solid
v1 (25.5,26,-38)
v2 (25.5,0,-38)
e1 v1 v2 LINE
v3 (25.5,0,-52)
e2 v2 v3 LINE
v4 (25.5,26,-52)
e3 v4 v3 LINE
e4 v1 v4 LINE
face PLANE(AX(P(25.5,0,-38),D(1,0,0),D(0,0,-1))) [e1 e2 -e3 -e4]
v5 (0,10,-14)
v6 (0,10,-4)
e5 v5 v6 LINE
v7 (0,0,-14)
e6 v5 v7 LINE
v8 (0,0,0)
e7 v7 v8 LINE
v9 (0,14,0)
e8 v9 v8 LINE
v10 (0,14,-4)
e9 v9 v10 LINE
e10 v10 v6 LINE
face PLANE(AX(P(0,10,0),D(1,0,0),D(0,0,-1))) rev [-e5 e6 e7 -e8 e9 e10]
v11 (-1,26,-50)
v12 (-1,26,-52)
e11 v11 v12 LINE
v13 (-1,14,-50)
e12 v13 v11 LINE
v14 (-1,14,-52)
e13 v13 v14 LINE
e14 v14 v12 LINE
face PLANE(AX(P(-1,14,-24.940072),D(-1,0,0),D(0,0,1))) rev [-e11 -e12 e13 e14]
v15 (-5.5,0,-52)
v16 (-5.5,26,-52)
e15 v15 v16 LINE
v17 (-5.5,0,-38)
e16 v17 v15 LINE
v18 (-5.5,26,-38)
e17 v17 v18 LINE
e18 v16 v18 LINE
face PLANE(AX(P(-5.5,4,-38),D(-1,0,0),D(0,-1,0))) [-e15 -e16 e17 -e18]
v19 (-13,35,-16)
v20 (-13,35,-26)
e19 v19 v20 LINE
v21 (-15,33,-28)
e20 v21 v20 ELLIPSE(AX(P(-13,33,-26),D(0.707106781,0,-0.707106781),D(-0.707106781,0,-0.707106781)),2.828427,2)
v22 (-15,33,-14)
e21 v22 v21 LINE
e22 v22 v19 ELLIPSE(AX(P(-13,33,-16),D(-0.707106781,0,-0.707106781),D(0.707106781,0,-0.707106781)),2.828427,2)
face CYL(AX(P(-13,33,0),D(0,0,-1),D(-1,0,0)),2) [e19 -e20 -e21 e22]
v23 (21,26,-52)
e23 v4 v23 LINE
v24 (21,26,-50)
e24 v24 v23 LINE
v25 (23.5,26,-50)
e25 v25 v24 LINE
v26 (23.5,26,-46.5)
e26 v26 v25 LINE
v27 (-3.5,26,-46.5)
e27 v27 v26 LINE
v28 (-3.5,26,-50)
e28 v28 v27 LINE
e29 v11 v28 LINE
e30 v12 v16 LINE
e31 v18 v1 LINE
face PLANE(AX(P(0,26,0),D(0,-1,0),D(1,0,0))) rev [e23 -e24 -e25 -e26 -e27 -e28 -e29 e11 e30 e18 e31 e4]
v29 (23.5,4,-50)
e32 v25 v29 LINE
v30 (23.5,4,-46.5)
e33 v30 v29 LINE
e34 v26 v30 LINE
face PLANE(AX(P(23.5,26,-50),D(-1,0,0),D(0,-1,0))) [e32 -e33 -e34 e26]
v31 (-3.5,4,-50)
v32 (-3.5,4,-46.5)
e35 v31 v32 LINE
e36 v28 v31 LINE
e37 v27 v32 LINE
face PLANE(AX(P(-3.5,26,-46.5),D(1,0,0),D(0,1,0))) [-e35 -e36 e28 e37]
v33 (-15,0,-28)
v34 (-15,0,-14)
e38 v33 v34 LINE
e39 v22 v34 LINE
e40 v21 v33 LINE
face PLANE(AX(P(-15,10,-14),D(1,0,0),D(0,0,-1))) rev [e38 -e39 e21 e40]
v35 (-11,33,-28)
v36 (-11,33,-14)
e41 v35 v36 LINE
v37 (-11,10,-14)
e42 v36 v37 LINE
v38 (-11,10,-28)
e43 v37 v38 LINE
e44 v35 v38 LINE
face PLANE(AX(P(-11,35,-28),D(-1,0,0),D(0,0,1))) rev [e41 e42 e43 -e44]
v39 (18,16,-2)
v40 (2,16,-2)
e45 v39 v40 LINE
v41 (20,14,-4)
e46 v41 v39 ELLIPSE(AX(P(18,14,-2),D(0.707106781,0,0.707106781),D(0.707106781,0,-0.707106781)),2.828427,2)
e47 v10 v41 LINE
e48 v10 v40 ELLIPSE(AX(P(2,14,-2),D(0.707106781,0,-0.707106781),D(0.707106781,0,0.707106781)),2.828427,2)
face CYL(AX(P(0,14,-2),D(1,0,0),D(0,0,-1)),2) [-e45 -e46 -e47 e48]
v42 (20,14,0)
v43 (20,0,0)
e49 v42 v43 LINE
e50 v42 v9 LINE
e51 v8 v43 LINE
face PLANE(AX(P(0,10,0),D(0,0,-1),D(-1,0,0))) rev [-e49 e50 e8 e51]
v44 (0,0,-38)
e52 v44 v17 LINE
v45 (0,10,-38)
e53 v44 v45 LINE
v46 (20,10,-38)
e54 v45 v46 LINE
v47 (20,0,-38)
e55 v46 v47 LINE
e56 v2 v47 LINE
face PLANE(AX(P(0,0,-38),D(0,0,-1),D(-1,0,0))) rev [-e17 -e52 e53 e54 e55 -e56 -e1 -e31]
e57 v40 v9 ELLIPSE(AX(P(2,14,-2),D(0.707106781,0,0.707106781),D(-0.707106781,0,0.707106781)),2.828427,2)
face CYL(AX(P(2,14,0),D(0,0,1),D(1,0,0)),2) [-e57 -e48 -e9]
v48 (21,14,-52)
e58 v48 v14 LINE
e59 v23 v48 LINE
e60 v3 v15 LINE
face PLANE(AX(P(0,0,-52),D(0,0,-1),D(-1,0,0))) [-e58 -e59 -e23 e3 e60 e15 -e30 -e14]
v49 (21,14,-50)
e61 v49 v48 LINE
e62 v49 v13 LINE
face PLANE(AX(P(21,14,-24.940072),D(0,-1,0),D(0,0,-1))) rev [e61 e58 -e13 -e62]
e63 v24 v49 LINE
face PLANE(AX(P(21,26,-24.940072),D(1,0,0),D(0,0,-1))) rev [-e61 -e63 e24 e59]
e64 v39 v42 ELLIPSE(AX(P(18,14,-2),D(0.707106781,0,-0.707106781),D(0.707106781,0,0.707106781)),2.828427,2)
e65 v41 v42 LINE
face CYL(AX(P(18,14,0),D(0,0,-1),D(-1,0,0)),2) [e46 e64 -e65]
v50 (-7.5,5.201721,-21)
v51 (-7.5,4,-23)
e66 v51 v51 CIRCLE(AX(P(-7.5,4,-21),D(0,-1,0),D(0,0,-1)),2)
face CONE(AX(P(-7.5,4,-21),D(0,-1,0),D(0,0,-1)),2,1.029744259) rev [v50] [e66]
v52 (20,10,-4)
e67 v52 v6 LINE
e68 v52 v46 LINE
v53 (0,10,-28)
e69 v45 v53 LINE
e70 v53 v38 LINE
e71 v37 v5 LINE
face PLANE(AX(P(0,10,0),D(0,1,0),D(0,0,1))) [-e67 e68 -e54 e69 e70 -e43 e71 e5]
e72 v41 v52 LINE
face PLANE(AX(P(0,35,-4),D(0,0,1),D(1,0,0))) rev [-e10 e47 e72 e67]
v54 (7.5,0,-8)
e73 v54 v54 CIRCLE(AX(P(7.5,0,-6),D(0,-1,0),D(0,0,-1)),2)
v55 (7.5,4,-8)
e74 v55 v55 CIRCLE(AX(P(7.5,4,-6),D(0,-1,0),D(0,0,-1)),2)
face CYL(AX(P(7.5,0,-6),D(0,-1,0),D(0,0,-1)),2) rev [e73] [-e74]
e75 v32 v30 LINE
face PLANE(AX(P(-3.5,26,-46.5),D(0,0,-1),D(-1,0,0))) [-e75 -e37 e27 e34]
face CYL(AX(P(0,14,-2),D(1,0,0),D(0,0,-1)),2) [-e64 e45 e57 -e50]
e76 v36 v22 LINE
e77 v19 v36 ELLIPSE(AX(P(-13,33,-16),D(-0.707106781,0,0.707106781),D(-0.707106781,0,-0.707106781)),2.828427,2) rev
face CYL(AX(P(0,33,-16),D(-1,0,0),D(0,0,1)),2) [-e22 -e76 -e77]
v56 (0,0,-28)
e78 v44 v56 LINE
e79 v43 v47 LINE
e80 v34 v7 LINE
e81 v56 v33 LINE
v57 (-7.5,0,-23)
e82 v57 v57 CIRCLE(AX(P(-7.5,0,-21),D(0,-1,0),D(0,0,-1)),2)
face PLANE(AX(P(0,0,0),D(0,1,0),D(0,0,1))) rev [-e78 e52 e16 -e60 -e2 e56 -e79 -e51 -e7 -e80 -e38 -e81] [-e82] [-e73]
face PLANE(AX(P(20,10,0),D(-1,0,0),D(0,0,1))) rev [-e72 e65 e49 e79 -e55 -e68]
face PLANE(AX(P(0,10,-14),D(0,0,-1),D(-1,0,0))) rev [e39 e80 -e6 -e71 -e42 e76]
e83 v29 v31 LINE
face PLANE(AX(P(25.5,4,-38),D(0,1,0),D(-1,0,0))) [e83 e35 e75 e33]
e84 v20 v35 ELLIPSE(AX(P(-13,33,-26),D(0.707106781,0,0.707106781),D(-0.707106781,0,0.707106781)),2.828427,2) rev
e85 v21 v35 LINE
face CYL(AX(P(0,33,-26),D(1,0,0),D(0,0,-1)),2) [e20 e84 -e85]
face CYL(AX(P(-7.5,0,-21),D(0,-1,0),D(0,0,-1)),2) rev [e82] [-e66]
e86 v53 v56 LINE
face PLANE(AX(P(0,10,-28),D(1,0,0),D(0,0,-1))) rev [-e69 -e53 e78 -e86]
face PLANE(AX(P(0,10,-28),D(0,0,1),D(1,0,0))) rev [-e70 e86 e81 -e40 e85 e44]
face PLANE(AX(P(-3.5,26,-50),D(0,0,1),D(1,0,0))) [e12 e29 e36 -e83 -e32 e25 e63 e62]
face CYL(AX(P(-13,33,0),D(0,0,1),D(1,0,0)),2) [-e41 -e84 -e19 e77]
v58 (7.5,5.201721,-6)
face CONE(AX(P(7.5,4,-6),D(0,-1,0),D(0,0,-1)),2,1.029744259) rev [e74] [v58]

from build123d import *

# Parameters (mm, degrees)
RESSALTO_EXTRUS_O1_DEPTH       = 10
ESBO_O2_W                      = 4
ESBO_O2_H                      = 14
ESBO_O2_W_2                    = 20
ESBO_O2_H_2                    = 4
RESSALTO_EXTRUS_O2_DEPTH       = 25
ESBO_O5_W                      = 20
ESBO_O5_H                      = 42
CORTE_EXTRUS_O1_DEPTH          = 19
FILETE4_R                      = 2
RESSALTO_EXTRUS_O3_DEPTH       = 10
RESSALTO_EXTRUS_O3_DEPTH_BACK  = 4
ESBO_O8_W                      = 31
ESBO_O8_H                      = 4
FURO_DE_DI_METRO_4_0_4_1_D     = 4
FURO_DE_DI_METRO_4_0_4_1_DEPTH = 4
FURO_DE_DI_METRO_4_0_4_1_TIP   = 1.201721238
ESBO_O9_W                      = 27
ESBO_O9_H                      = 3.5
RESSALTO_EXTRUS_O4_DEPTH       = 22
ESBO_O10_W                     = 20
ESBO_O10_H                     = 4
RESSALTO_EXTRUS_O5_DEPTH       = 16
ESBO_O11_W                     = 22
ESBO_O11_H                     = 12
CORTE_EXTRUS_O2_DEPTH          = 2


with BuildPart() as part:
    # Esboço1 → Ressalto-extrusão1 (new body)
    with BuildSketch(Plane(origin=(0, 0, 0), x_dir=(1, 0, 0), z_dir=(0, 1, 0))):
        Polygon((0, 28), (-15, 28), (-15, 14), (0, 14), (0, 0), (20, 0), (20, 42), (0, 42), align=None)
    extrude(amount=RESSALTO_EXTRUS_O1_DEPTH)

    # Esboço2 → Ressalto-extrusão2 (add)
    with BuildSketch(Plane(origin=(0, 10, 0), x_dir=(1, 0, 0), z_dir=(0, 1, 0))):
        with Locations((-13, 21)):
            Rectangle(ESBO_O2_W, ESBO_O2_H)
        with Locations((10, 2)):
            Rectangle(ESBO_O2_W_2, ESBO_O2_H_2)
    extrude(amount=RESSALTO_EXTRUS_O2_DEPTH)

    # Esboço5 → Corte-extrusão1 (cut)
    with BuildSketch(Plane(origin=(0, 35, 0), x_dir=(1, 0, 0), z_dir=(0, 1, 0))):
        with Locations((10, 21)):
            Rectangle(ESBO_O5_W, ESBO_O5_H)
    extrude(amount=-CORTE_EXTRUS_O1_DEPTH, mode=Mode.SUBTRACT)

    # Filete4
    filete4_edges = [part.edges().sort_by_distance(p)[0] for p in [
        (-15, 35, -21),
        (-13, 35, -14),
        (-11, 35, -21),
        (-13, 35, -28),
        (10, 16, -4),
        (20, 16, -2),
        (10, 16, 0),
        (0, 16, -2),
    ]]
    fillet(filete4_edges, radius=FILETE4_R - 0.0001)  # a hair under: the kernel refuses the full size

    # Esboço8 → Ressalto-extrusão3 (add, two sides: drawn at the far end of the back side and taken through both)
    with BuildSketch(Plane(origin=(0, 0, -42), x_dir=(-1, 0, 0), z_dir=(0, 0, -1)).offset(-RESSALTO_EXTRUS_O3_DEPTH_BACK)):
        with Locations((-10, 2)):
            Rectangle(ESBO_O8_W, ESBO_O8_H)
    extrude(amount=RESSALTO_EXTRUS_O3_DEPTH + RESSALTO_EXTRUS_O3_DEPTH_BACK)

    # Furo de diâmetro Ø4.0 (4)1
    with Locations(Plane(origin=(-7.5, 0, -21), x_dir=(0, 0, -1), z_dir=(0, -1, 0))):
        with Locations((0, 0), (-15, 15)):
            Hole(FURO_DE_DI_METRO_4_0_4_1_D / 2, depth=FURO_DE_DI_METRO_4_0_4_1_DEPTH)
            with Locations((0, 0, -(FURO_DE_DI_METRO_4_0_4_1_DEPTH + FURO_DE_DI_METRO_4_0_4_1_TIP / 2))):  # 118° drill point
                Cone(0, FURO_DE_DI_METRO_4_0_4_1_D / 2, FURO_DE_DI_METRO_4_0_4_1_TIP, mode=Mode.SUBTRACT)

    # Esboço9 → Ressalto-extrusão4 (add)
    with BuildSketch(Plane(origin=(0, 4, 0), x_dir=(1, 0, 0), z_dir=(0, 1, 0))):
        Polygon((20, 42), (20, 38), (25.5, 38), (25.5, 52), (-5.5, 52), (-5.5, 38), (0, 38), (0, 42), align=None)
        with Locations((10, 48.25)):
            Rectangle(ESBO_O9_W, ESBO_O9_H, mode=Mode.SUBTRACT)
    extrude(amount=RESSALTO_EXTRUS_O4_DEPTH)

    # Esboço10 → Ressalto-extrusão5 (add)
    with BuildSketch(Plane(origin=(0, 10, 0), x_dir=(1, 0, 0), z_dir=(0, 1, 0))):
        with Locations((10, 40)):
            Rectangle(ESBO_O10_W, ESBO_O10_H)
    extrude(amount=RESSALTO_EXTRUS_O5_DEPTH)

    # Esboço11 → Corte-extrusão2 (cut)
    with BuildSketch(Plane(origin=(0, 0, -52), x_dir=(-1, 0, 0), z_dir=(0, 0, -1))):
        with Locations((-10, 20)):
            Rectangle(ESBO_O11_W, ESBO_O11_H)
    extrude(amount=-CORTE_EXTRUS_O2_DEPTH, mode=Mode.SUBTRACT)


solid = part.part
